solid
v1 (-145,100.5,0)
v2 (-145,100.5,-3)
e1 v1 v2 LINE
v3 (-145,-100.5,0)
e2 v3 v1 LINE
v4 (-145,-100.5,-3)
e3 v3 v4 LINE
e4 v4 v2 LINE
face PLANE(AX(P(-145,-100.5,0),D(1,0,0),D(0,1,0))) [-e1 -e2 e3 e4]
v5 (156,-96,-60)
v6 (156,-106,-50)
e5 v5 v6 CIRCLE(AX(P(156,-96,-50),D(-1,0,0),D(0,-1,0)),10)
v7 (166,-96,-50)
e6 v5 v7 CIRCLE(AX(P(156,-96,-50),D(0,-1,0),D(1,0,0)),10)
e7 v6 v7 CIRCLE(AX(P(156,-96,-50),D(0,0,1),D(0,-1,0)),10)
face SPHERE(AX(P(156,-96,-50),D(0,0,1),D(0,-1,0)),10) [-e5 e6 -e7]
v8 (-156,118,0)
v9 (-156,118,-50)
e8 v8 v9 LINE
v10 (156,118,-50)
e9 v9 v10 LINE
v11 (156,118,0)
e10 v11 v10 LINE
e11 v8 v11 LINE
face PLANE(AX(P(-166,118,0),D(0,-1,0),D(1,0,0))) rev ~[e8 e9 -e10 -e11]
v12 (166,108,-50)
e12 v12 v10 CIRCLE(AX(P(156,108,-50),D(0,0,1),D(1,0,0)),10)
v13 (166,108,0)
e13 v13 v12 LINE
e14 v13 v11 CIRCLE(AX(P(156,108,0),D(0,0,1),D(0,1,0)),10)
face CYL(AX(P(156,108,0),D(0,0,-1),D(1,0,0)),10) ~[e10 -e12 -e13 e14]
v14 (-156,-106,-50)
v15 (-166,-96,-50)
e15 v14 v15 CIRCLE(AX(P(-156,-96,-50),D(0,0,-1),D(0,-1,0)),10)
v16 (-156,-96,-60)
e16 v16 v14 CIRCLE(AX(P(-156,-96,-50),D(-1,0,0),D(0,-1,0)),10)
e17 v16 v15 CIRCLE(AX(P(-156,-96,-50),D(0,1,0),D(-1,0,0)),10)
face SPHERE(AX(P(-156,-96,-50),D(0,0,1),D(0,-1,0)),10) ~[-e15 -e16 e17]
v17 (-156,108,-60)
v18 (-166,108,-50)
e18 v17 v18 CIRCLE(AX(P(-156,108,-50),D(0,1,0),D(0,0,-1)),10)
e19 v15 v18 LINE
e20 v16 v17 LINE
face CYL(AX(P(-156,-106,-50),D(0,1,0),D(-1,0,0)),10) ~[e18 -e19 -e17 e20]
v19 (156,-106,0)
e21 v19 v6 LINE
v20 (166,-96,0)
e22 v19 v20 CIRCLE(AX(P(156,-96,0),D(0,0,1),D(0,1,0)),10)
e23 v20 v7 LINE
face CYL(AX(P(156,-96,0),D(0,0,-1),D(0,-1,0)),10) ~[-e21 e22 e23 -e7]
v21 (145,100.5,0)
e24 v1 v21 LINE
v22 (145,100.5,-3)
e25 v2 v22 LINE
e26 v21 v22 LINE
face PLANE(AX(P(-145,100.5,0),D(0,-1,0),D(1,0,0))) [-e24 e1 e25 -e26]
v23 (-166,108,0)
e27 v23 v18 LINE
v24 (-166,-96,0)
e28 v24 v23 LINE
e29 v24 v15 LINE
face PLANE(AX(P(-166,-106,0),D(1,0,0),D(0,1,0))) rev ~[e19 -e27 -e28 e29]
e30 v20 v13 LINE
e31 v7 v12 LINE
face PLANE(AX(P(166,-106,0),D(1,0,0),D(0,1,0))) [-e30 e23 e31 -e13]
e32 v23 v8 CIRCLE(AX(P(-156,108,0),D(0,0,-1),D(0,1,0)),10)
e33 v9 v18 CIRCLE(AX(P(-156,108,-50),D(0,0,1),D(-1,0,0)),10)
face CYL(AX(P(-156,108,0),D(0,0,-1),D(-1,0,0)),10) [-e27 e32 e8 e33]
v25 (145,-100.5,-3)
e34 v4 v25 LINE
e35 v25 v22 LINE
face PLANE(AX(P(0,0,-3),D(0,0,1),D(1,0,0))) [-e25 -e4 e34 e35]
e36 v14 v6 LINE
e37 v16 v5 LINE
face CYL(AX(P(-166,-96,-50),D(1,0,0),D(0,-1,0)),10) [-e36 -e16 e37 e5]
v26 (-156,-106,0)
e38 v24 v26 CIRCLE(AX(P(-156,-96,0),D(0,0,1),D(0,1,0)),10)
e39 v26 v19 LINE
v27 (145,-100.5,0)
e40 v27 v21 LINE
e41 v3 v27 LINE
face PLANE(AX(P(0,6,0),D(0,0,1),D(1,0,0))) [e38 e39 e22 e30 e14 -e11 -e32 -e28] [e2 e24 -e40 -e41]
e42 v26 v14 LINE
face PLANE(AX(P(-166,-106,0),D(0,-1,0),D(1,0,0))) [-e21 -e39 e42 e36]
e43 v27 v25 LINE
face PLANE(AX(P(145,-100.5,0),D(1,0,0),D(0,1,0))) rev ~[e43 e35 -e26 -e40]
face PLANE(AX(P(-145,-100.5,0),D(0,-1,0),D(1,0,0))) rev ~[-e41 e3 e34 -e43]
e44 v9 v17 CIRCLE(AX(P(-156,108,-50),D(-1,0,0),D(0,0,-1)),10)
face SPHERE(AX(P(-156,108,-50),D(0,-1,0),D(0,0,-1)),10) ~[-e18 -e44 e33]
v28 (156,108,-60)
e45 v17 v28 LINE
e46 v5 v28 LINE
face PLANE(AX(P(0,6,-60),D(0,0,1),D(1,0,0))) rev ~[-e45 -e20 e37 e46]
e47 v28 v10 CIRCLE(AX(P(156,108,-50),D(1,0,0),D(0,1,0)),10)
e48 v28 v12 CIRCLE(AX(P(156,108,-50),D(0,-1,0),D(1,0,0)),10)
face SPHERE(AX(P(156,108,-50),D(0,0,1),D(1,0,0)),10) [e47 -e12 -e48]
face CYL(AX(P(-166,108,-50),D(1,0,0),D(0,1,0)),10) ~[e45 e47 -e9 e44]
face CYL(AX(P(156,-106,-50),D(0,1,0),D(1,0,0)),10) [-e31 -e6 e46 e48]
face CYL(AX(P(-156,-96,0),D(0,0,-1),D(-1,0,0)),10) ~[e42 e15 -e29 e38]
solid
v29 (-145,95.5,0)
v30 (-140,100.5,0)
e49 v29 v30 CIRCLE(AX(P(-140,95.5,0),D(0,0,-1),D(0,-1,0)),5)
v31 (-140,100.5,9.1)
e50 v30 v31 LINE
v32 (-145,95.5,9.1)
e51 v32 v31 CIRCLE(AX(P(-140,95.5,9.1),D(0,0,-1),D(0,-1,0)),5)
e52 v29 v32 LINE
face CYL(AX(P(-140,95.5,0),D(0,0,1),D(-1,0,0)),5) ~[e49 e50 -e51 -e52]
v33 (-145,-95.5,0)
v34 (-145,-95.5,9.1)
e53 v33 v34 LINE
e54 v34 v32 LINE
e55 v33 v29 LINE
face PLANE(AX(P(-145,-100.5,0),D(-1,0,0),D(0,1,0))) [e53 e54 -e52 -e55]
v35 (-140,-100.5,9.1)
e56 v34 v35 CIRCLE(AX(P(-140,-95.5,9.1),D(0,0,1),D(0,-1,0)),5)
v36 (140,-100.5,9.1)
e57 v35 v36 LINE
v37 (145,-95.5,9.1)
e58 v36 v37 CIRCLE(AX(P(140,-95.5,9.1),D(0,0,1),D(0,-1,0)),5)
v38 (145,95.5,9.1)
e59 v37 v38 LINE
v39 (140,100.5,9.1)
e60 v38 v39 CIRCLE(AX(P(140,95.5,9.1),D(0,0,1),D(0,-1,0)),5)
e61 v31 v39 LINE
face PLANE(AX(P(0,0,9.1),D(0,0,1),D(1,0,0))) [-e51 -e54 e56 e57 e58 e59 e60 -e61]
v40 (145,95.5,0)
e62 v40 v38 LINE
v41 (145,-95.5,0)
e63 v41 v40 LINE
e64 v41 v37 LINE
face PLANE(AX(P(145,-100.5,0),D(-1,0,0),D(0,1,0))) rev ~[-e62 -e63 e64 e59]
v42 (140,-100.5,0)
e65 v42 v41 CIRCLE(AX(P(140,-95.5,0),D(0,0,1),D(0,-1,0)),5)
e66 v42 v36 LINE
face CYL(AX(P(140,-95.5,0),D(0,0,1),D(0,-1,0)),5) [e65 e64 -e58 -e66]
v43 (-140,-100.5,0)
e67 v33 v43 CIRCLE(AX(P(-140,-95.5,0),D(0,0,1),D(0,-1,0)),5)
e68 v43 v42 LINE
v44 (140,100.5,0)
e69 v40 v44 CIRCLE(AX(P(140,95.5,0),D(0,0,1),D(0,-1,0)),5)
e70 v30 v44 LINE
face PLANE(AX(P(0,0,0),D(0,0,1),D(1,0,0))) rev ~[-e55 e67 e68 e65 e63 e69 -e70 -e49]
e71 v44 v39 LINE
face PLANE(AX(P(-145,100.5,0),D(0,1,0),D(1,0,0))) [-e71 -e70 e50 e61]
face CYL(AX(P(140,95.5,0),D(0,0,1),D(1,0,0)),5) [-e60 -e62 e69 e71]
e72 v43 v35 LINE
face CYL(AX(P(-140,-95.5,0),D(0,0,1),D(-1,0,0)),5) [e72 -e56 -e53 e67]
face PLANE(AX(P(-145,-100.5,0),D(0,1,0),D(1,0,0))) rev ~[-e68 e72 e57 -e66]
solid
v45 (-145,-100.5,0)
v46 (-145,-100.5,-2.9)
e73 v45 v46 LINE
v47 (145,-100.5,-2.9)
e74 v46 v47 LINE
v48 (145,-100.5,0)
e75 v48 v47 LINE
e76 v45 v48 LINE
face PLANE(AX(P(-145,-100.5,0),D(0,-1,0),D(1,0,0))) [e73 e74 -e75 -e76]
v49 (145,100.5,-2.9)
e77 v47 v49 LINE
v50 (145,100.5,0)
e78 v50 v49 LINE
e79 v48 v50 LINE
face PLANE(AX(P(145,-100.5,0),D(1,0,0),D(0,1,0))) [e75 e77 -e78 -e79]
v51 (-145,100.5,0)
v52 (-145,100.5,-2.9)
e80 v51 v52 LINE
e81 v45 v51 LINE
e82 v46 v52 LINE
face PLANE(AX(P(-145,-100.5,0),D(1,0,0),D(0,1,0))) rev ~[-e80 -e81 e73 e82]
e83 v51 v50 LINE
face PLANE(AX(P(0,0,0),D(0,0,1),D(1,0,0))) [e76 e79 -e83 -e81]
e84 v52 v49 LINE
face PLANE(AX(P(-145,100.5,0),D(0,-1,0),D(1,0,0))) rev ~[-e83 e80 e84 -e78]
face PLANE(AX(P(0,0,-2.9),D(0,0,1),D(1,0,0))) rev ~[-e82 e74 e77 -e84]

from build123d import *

# Parameters (mm, degrees)
F0_W     = 332
F0_H     = 224
F0_W_2   = 290
F0_H_2   = 201
F1_DEPTH = 60
F2_R     = 10
F3_DEPTH = 3
F4_DEPTH = 2.9
F5_DEPTH = 9.1
F6_R     = 5


# Not quite as in the source:
# - the program builds the solid bodies; features that only make, move or delete a surface that nothing else refers to are left out


with BuildPart() as f1:
    # F0 (on Top) → F1 (new body)
    with BuildSketch(Plane.XY):
        with Locations((0, 6)):
            Rectangle(F0_W, F0_H)
        Rectangle(F0_W_2, F0_H_2, mode=Mode.SUBTRACT)
        Rectangle(F0_W_2, F0_H_2)
    extrude(amount=-F1_DEPTH)

    # F2
    f2_edges = [f1.edges().sort_by_distance(p)[0] for p in [
        (166, -106, -30),
        (166, 118, -30),
        (-166, -106, -30),
        (0, -106, -60),
        (166, 6, -60),
        (-166, 6, -60),
        (0, 118, -60),
        (-166, 118, -30),
    ]]
    fillet(f2_edges, radius=F2_R)

    # F0 (on Top) → F3 (cut)
    with BuildSketch(Plane.XY):
        Rectangle(F0_W_2, F0_H_2)
    extrude(amount=-F3_DEPTH, mode=Mode.SUBTRACT)


with BuildPart() as f4:
    # F0 (on Top) → F4 (new body)
    with BuildSketch(Plane.XY):
        Rectangle(F0_W_2, F0_H_2)
    extrude(amount=-F4_DEPTH)


with BuildPart() as f5:
    # F0 (on Top) → F5 (new body)
    with BuildSketch(Plane.XY):
        Rectangle(F0_W_2, F0_H_2)
    extrude(amount=F5_DEPTH)

    # F6
    f6_edges = [f5.edges().sort_by_distance(p)[0] for p in [
        (145, -100.5, 4.55),
        (145, 100.5, 4.55),
        (-145, -100.5, 4.55),
        (-145, 100.5, 4.55),
    ]]
    fillet(f6_edges, radius=F6_R)


solid = Compound([f1.part, f4.part, f5.part])
